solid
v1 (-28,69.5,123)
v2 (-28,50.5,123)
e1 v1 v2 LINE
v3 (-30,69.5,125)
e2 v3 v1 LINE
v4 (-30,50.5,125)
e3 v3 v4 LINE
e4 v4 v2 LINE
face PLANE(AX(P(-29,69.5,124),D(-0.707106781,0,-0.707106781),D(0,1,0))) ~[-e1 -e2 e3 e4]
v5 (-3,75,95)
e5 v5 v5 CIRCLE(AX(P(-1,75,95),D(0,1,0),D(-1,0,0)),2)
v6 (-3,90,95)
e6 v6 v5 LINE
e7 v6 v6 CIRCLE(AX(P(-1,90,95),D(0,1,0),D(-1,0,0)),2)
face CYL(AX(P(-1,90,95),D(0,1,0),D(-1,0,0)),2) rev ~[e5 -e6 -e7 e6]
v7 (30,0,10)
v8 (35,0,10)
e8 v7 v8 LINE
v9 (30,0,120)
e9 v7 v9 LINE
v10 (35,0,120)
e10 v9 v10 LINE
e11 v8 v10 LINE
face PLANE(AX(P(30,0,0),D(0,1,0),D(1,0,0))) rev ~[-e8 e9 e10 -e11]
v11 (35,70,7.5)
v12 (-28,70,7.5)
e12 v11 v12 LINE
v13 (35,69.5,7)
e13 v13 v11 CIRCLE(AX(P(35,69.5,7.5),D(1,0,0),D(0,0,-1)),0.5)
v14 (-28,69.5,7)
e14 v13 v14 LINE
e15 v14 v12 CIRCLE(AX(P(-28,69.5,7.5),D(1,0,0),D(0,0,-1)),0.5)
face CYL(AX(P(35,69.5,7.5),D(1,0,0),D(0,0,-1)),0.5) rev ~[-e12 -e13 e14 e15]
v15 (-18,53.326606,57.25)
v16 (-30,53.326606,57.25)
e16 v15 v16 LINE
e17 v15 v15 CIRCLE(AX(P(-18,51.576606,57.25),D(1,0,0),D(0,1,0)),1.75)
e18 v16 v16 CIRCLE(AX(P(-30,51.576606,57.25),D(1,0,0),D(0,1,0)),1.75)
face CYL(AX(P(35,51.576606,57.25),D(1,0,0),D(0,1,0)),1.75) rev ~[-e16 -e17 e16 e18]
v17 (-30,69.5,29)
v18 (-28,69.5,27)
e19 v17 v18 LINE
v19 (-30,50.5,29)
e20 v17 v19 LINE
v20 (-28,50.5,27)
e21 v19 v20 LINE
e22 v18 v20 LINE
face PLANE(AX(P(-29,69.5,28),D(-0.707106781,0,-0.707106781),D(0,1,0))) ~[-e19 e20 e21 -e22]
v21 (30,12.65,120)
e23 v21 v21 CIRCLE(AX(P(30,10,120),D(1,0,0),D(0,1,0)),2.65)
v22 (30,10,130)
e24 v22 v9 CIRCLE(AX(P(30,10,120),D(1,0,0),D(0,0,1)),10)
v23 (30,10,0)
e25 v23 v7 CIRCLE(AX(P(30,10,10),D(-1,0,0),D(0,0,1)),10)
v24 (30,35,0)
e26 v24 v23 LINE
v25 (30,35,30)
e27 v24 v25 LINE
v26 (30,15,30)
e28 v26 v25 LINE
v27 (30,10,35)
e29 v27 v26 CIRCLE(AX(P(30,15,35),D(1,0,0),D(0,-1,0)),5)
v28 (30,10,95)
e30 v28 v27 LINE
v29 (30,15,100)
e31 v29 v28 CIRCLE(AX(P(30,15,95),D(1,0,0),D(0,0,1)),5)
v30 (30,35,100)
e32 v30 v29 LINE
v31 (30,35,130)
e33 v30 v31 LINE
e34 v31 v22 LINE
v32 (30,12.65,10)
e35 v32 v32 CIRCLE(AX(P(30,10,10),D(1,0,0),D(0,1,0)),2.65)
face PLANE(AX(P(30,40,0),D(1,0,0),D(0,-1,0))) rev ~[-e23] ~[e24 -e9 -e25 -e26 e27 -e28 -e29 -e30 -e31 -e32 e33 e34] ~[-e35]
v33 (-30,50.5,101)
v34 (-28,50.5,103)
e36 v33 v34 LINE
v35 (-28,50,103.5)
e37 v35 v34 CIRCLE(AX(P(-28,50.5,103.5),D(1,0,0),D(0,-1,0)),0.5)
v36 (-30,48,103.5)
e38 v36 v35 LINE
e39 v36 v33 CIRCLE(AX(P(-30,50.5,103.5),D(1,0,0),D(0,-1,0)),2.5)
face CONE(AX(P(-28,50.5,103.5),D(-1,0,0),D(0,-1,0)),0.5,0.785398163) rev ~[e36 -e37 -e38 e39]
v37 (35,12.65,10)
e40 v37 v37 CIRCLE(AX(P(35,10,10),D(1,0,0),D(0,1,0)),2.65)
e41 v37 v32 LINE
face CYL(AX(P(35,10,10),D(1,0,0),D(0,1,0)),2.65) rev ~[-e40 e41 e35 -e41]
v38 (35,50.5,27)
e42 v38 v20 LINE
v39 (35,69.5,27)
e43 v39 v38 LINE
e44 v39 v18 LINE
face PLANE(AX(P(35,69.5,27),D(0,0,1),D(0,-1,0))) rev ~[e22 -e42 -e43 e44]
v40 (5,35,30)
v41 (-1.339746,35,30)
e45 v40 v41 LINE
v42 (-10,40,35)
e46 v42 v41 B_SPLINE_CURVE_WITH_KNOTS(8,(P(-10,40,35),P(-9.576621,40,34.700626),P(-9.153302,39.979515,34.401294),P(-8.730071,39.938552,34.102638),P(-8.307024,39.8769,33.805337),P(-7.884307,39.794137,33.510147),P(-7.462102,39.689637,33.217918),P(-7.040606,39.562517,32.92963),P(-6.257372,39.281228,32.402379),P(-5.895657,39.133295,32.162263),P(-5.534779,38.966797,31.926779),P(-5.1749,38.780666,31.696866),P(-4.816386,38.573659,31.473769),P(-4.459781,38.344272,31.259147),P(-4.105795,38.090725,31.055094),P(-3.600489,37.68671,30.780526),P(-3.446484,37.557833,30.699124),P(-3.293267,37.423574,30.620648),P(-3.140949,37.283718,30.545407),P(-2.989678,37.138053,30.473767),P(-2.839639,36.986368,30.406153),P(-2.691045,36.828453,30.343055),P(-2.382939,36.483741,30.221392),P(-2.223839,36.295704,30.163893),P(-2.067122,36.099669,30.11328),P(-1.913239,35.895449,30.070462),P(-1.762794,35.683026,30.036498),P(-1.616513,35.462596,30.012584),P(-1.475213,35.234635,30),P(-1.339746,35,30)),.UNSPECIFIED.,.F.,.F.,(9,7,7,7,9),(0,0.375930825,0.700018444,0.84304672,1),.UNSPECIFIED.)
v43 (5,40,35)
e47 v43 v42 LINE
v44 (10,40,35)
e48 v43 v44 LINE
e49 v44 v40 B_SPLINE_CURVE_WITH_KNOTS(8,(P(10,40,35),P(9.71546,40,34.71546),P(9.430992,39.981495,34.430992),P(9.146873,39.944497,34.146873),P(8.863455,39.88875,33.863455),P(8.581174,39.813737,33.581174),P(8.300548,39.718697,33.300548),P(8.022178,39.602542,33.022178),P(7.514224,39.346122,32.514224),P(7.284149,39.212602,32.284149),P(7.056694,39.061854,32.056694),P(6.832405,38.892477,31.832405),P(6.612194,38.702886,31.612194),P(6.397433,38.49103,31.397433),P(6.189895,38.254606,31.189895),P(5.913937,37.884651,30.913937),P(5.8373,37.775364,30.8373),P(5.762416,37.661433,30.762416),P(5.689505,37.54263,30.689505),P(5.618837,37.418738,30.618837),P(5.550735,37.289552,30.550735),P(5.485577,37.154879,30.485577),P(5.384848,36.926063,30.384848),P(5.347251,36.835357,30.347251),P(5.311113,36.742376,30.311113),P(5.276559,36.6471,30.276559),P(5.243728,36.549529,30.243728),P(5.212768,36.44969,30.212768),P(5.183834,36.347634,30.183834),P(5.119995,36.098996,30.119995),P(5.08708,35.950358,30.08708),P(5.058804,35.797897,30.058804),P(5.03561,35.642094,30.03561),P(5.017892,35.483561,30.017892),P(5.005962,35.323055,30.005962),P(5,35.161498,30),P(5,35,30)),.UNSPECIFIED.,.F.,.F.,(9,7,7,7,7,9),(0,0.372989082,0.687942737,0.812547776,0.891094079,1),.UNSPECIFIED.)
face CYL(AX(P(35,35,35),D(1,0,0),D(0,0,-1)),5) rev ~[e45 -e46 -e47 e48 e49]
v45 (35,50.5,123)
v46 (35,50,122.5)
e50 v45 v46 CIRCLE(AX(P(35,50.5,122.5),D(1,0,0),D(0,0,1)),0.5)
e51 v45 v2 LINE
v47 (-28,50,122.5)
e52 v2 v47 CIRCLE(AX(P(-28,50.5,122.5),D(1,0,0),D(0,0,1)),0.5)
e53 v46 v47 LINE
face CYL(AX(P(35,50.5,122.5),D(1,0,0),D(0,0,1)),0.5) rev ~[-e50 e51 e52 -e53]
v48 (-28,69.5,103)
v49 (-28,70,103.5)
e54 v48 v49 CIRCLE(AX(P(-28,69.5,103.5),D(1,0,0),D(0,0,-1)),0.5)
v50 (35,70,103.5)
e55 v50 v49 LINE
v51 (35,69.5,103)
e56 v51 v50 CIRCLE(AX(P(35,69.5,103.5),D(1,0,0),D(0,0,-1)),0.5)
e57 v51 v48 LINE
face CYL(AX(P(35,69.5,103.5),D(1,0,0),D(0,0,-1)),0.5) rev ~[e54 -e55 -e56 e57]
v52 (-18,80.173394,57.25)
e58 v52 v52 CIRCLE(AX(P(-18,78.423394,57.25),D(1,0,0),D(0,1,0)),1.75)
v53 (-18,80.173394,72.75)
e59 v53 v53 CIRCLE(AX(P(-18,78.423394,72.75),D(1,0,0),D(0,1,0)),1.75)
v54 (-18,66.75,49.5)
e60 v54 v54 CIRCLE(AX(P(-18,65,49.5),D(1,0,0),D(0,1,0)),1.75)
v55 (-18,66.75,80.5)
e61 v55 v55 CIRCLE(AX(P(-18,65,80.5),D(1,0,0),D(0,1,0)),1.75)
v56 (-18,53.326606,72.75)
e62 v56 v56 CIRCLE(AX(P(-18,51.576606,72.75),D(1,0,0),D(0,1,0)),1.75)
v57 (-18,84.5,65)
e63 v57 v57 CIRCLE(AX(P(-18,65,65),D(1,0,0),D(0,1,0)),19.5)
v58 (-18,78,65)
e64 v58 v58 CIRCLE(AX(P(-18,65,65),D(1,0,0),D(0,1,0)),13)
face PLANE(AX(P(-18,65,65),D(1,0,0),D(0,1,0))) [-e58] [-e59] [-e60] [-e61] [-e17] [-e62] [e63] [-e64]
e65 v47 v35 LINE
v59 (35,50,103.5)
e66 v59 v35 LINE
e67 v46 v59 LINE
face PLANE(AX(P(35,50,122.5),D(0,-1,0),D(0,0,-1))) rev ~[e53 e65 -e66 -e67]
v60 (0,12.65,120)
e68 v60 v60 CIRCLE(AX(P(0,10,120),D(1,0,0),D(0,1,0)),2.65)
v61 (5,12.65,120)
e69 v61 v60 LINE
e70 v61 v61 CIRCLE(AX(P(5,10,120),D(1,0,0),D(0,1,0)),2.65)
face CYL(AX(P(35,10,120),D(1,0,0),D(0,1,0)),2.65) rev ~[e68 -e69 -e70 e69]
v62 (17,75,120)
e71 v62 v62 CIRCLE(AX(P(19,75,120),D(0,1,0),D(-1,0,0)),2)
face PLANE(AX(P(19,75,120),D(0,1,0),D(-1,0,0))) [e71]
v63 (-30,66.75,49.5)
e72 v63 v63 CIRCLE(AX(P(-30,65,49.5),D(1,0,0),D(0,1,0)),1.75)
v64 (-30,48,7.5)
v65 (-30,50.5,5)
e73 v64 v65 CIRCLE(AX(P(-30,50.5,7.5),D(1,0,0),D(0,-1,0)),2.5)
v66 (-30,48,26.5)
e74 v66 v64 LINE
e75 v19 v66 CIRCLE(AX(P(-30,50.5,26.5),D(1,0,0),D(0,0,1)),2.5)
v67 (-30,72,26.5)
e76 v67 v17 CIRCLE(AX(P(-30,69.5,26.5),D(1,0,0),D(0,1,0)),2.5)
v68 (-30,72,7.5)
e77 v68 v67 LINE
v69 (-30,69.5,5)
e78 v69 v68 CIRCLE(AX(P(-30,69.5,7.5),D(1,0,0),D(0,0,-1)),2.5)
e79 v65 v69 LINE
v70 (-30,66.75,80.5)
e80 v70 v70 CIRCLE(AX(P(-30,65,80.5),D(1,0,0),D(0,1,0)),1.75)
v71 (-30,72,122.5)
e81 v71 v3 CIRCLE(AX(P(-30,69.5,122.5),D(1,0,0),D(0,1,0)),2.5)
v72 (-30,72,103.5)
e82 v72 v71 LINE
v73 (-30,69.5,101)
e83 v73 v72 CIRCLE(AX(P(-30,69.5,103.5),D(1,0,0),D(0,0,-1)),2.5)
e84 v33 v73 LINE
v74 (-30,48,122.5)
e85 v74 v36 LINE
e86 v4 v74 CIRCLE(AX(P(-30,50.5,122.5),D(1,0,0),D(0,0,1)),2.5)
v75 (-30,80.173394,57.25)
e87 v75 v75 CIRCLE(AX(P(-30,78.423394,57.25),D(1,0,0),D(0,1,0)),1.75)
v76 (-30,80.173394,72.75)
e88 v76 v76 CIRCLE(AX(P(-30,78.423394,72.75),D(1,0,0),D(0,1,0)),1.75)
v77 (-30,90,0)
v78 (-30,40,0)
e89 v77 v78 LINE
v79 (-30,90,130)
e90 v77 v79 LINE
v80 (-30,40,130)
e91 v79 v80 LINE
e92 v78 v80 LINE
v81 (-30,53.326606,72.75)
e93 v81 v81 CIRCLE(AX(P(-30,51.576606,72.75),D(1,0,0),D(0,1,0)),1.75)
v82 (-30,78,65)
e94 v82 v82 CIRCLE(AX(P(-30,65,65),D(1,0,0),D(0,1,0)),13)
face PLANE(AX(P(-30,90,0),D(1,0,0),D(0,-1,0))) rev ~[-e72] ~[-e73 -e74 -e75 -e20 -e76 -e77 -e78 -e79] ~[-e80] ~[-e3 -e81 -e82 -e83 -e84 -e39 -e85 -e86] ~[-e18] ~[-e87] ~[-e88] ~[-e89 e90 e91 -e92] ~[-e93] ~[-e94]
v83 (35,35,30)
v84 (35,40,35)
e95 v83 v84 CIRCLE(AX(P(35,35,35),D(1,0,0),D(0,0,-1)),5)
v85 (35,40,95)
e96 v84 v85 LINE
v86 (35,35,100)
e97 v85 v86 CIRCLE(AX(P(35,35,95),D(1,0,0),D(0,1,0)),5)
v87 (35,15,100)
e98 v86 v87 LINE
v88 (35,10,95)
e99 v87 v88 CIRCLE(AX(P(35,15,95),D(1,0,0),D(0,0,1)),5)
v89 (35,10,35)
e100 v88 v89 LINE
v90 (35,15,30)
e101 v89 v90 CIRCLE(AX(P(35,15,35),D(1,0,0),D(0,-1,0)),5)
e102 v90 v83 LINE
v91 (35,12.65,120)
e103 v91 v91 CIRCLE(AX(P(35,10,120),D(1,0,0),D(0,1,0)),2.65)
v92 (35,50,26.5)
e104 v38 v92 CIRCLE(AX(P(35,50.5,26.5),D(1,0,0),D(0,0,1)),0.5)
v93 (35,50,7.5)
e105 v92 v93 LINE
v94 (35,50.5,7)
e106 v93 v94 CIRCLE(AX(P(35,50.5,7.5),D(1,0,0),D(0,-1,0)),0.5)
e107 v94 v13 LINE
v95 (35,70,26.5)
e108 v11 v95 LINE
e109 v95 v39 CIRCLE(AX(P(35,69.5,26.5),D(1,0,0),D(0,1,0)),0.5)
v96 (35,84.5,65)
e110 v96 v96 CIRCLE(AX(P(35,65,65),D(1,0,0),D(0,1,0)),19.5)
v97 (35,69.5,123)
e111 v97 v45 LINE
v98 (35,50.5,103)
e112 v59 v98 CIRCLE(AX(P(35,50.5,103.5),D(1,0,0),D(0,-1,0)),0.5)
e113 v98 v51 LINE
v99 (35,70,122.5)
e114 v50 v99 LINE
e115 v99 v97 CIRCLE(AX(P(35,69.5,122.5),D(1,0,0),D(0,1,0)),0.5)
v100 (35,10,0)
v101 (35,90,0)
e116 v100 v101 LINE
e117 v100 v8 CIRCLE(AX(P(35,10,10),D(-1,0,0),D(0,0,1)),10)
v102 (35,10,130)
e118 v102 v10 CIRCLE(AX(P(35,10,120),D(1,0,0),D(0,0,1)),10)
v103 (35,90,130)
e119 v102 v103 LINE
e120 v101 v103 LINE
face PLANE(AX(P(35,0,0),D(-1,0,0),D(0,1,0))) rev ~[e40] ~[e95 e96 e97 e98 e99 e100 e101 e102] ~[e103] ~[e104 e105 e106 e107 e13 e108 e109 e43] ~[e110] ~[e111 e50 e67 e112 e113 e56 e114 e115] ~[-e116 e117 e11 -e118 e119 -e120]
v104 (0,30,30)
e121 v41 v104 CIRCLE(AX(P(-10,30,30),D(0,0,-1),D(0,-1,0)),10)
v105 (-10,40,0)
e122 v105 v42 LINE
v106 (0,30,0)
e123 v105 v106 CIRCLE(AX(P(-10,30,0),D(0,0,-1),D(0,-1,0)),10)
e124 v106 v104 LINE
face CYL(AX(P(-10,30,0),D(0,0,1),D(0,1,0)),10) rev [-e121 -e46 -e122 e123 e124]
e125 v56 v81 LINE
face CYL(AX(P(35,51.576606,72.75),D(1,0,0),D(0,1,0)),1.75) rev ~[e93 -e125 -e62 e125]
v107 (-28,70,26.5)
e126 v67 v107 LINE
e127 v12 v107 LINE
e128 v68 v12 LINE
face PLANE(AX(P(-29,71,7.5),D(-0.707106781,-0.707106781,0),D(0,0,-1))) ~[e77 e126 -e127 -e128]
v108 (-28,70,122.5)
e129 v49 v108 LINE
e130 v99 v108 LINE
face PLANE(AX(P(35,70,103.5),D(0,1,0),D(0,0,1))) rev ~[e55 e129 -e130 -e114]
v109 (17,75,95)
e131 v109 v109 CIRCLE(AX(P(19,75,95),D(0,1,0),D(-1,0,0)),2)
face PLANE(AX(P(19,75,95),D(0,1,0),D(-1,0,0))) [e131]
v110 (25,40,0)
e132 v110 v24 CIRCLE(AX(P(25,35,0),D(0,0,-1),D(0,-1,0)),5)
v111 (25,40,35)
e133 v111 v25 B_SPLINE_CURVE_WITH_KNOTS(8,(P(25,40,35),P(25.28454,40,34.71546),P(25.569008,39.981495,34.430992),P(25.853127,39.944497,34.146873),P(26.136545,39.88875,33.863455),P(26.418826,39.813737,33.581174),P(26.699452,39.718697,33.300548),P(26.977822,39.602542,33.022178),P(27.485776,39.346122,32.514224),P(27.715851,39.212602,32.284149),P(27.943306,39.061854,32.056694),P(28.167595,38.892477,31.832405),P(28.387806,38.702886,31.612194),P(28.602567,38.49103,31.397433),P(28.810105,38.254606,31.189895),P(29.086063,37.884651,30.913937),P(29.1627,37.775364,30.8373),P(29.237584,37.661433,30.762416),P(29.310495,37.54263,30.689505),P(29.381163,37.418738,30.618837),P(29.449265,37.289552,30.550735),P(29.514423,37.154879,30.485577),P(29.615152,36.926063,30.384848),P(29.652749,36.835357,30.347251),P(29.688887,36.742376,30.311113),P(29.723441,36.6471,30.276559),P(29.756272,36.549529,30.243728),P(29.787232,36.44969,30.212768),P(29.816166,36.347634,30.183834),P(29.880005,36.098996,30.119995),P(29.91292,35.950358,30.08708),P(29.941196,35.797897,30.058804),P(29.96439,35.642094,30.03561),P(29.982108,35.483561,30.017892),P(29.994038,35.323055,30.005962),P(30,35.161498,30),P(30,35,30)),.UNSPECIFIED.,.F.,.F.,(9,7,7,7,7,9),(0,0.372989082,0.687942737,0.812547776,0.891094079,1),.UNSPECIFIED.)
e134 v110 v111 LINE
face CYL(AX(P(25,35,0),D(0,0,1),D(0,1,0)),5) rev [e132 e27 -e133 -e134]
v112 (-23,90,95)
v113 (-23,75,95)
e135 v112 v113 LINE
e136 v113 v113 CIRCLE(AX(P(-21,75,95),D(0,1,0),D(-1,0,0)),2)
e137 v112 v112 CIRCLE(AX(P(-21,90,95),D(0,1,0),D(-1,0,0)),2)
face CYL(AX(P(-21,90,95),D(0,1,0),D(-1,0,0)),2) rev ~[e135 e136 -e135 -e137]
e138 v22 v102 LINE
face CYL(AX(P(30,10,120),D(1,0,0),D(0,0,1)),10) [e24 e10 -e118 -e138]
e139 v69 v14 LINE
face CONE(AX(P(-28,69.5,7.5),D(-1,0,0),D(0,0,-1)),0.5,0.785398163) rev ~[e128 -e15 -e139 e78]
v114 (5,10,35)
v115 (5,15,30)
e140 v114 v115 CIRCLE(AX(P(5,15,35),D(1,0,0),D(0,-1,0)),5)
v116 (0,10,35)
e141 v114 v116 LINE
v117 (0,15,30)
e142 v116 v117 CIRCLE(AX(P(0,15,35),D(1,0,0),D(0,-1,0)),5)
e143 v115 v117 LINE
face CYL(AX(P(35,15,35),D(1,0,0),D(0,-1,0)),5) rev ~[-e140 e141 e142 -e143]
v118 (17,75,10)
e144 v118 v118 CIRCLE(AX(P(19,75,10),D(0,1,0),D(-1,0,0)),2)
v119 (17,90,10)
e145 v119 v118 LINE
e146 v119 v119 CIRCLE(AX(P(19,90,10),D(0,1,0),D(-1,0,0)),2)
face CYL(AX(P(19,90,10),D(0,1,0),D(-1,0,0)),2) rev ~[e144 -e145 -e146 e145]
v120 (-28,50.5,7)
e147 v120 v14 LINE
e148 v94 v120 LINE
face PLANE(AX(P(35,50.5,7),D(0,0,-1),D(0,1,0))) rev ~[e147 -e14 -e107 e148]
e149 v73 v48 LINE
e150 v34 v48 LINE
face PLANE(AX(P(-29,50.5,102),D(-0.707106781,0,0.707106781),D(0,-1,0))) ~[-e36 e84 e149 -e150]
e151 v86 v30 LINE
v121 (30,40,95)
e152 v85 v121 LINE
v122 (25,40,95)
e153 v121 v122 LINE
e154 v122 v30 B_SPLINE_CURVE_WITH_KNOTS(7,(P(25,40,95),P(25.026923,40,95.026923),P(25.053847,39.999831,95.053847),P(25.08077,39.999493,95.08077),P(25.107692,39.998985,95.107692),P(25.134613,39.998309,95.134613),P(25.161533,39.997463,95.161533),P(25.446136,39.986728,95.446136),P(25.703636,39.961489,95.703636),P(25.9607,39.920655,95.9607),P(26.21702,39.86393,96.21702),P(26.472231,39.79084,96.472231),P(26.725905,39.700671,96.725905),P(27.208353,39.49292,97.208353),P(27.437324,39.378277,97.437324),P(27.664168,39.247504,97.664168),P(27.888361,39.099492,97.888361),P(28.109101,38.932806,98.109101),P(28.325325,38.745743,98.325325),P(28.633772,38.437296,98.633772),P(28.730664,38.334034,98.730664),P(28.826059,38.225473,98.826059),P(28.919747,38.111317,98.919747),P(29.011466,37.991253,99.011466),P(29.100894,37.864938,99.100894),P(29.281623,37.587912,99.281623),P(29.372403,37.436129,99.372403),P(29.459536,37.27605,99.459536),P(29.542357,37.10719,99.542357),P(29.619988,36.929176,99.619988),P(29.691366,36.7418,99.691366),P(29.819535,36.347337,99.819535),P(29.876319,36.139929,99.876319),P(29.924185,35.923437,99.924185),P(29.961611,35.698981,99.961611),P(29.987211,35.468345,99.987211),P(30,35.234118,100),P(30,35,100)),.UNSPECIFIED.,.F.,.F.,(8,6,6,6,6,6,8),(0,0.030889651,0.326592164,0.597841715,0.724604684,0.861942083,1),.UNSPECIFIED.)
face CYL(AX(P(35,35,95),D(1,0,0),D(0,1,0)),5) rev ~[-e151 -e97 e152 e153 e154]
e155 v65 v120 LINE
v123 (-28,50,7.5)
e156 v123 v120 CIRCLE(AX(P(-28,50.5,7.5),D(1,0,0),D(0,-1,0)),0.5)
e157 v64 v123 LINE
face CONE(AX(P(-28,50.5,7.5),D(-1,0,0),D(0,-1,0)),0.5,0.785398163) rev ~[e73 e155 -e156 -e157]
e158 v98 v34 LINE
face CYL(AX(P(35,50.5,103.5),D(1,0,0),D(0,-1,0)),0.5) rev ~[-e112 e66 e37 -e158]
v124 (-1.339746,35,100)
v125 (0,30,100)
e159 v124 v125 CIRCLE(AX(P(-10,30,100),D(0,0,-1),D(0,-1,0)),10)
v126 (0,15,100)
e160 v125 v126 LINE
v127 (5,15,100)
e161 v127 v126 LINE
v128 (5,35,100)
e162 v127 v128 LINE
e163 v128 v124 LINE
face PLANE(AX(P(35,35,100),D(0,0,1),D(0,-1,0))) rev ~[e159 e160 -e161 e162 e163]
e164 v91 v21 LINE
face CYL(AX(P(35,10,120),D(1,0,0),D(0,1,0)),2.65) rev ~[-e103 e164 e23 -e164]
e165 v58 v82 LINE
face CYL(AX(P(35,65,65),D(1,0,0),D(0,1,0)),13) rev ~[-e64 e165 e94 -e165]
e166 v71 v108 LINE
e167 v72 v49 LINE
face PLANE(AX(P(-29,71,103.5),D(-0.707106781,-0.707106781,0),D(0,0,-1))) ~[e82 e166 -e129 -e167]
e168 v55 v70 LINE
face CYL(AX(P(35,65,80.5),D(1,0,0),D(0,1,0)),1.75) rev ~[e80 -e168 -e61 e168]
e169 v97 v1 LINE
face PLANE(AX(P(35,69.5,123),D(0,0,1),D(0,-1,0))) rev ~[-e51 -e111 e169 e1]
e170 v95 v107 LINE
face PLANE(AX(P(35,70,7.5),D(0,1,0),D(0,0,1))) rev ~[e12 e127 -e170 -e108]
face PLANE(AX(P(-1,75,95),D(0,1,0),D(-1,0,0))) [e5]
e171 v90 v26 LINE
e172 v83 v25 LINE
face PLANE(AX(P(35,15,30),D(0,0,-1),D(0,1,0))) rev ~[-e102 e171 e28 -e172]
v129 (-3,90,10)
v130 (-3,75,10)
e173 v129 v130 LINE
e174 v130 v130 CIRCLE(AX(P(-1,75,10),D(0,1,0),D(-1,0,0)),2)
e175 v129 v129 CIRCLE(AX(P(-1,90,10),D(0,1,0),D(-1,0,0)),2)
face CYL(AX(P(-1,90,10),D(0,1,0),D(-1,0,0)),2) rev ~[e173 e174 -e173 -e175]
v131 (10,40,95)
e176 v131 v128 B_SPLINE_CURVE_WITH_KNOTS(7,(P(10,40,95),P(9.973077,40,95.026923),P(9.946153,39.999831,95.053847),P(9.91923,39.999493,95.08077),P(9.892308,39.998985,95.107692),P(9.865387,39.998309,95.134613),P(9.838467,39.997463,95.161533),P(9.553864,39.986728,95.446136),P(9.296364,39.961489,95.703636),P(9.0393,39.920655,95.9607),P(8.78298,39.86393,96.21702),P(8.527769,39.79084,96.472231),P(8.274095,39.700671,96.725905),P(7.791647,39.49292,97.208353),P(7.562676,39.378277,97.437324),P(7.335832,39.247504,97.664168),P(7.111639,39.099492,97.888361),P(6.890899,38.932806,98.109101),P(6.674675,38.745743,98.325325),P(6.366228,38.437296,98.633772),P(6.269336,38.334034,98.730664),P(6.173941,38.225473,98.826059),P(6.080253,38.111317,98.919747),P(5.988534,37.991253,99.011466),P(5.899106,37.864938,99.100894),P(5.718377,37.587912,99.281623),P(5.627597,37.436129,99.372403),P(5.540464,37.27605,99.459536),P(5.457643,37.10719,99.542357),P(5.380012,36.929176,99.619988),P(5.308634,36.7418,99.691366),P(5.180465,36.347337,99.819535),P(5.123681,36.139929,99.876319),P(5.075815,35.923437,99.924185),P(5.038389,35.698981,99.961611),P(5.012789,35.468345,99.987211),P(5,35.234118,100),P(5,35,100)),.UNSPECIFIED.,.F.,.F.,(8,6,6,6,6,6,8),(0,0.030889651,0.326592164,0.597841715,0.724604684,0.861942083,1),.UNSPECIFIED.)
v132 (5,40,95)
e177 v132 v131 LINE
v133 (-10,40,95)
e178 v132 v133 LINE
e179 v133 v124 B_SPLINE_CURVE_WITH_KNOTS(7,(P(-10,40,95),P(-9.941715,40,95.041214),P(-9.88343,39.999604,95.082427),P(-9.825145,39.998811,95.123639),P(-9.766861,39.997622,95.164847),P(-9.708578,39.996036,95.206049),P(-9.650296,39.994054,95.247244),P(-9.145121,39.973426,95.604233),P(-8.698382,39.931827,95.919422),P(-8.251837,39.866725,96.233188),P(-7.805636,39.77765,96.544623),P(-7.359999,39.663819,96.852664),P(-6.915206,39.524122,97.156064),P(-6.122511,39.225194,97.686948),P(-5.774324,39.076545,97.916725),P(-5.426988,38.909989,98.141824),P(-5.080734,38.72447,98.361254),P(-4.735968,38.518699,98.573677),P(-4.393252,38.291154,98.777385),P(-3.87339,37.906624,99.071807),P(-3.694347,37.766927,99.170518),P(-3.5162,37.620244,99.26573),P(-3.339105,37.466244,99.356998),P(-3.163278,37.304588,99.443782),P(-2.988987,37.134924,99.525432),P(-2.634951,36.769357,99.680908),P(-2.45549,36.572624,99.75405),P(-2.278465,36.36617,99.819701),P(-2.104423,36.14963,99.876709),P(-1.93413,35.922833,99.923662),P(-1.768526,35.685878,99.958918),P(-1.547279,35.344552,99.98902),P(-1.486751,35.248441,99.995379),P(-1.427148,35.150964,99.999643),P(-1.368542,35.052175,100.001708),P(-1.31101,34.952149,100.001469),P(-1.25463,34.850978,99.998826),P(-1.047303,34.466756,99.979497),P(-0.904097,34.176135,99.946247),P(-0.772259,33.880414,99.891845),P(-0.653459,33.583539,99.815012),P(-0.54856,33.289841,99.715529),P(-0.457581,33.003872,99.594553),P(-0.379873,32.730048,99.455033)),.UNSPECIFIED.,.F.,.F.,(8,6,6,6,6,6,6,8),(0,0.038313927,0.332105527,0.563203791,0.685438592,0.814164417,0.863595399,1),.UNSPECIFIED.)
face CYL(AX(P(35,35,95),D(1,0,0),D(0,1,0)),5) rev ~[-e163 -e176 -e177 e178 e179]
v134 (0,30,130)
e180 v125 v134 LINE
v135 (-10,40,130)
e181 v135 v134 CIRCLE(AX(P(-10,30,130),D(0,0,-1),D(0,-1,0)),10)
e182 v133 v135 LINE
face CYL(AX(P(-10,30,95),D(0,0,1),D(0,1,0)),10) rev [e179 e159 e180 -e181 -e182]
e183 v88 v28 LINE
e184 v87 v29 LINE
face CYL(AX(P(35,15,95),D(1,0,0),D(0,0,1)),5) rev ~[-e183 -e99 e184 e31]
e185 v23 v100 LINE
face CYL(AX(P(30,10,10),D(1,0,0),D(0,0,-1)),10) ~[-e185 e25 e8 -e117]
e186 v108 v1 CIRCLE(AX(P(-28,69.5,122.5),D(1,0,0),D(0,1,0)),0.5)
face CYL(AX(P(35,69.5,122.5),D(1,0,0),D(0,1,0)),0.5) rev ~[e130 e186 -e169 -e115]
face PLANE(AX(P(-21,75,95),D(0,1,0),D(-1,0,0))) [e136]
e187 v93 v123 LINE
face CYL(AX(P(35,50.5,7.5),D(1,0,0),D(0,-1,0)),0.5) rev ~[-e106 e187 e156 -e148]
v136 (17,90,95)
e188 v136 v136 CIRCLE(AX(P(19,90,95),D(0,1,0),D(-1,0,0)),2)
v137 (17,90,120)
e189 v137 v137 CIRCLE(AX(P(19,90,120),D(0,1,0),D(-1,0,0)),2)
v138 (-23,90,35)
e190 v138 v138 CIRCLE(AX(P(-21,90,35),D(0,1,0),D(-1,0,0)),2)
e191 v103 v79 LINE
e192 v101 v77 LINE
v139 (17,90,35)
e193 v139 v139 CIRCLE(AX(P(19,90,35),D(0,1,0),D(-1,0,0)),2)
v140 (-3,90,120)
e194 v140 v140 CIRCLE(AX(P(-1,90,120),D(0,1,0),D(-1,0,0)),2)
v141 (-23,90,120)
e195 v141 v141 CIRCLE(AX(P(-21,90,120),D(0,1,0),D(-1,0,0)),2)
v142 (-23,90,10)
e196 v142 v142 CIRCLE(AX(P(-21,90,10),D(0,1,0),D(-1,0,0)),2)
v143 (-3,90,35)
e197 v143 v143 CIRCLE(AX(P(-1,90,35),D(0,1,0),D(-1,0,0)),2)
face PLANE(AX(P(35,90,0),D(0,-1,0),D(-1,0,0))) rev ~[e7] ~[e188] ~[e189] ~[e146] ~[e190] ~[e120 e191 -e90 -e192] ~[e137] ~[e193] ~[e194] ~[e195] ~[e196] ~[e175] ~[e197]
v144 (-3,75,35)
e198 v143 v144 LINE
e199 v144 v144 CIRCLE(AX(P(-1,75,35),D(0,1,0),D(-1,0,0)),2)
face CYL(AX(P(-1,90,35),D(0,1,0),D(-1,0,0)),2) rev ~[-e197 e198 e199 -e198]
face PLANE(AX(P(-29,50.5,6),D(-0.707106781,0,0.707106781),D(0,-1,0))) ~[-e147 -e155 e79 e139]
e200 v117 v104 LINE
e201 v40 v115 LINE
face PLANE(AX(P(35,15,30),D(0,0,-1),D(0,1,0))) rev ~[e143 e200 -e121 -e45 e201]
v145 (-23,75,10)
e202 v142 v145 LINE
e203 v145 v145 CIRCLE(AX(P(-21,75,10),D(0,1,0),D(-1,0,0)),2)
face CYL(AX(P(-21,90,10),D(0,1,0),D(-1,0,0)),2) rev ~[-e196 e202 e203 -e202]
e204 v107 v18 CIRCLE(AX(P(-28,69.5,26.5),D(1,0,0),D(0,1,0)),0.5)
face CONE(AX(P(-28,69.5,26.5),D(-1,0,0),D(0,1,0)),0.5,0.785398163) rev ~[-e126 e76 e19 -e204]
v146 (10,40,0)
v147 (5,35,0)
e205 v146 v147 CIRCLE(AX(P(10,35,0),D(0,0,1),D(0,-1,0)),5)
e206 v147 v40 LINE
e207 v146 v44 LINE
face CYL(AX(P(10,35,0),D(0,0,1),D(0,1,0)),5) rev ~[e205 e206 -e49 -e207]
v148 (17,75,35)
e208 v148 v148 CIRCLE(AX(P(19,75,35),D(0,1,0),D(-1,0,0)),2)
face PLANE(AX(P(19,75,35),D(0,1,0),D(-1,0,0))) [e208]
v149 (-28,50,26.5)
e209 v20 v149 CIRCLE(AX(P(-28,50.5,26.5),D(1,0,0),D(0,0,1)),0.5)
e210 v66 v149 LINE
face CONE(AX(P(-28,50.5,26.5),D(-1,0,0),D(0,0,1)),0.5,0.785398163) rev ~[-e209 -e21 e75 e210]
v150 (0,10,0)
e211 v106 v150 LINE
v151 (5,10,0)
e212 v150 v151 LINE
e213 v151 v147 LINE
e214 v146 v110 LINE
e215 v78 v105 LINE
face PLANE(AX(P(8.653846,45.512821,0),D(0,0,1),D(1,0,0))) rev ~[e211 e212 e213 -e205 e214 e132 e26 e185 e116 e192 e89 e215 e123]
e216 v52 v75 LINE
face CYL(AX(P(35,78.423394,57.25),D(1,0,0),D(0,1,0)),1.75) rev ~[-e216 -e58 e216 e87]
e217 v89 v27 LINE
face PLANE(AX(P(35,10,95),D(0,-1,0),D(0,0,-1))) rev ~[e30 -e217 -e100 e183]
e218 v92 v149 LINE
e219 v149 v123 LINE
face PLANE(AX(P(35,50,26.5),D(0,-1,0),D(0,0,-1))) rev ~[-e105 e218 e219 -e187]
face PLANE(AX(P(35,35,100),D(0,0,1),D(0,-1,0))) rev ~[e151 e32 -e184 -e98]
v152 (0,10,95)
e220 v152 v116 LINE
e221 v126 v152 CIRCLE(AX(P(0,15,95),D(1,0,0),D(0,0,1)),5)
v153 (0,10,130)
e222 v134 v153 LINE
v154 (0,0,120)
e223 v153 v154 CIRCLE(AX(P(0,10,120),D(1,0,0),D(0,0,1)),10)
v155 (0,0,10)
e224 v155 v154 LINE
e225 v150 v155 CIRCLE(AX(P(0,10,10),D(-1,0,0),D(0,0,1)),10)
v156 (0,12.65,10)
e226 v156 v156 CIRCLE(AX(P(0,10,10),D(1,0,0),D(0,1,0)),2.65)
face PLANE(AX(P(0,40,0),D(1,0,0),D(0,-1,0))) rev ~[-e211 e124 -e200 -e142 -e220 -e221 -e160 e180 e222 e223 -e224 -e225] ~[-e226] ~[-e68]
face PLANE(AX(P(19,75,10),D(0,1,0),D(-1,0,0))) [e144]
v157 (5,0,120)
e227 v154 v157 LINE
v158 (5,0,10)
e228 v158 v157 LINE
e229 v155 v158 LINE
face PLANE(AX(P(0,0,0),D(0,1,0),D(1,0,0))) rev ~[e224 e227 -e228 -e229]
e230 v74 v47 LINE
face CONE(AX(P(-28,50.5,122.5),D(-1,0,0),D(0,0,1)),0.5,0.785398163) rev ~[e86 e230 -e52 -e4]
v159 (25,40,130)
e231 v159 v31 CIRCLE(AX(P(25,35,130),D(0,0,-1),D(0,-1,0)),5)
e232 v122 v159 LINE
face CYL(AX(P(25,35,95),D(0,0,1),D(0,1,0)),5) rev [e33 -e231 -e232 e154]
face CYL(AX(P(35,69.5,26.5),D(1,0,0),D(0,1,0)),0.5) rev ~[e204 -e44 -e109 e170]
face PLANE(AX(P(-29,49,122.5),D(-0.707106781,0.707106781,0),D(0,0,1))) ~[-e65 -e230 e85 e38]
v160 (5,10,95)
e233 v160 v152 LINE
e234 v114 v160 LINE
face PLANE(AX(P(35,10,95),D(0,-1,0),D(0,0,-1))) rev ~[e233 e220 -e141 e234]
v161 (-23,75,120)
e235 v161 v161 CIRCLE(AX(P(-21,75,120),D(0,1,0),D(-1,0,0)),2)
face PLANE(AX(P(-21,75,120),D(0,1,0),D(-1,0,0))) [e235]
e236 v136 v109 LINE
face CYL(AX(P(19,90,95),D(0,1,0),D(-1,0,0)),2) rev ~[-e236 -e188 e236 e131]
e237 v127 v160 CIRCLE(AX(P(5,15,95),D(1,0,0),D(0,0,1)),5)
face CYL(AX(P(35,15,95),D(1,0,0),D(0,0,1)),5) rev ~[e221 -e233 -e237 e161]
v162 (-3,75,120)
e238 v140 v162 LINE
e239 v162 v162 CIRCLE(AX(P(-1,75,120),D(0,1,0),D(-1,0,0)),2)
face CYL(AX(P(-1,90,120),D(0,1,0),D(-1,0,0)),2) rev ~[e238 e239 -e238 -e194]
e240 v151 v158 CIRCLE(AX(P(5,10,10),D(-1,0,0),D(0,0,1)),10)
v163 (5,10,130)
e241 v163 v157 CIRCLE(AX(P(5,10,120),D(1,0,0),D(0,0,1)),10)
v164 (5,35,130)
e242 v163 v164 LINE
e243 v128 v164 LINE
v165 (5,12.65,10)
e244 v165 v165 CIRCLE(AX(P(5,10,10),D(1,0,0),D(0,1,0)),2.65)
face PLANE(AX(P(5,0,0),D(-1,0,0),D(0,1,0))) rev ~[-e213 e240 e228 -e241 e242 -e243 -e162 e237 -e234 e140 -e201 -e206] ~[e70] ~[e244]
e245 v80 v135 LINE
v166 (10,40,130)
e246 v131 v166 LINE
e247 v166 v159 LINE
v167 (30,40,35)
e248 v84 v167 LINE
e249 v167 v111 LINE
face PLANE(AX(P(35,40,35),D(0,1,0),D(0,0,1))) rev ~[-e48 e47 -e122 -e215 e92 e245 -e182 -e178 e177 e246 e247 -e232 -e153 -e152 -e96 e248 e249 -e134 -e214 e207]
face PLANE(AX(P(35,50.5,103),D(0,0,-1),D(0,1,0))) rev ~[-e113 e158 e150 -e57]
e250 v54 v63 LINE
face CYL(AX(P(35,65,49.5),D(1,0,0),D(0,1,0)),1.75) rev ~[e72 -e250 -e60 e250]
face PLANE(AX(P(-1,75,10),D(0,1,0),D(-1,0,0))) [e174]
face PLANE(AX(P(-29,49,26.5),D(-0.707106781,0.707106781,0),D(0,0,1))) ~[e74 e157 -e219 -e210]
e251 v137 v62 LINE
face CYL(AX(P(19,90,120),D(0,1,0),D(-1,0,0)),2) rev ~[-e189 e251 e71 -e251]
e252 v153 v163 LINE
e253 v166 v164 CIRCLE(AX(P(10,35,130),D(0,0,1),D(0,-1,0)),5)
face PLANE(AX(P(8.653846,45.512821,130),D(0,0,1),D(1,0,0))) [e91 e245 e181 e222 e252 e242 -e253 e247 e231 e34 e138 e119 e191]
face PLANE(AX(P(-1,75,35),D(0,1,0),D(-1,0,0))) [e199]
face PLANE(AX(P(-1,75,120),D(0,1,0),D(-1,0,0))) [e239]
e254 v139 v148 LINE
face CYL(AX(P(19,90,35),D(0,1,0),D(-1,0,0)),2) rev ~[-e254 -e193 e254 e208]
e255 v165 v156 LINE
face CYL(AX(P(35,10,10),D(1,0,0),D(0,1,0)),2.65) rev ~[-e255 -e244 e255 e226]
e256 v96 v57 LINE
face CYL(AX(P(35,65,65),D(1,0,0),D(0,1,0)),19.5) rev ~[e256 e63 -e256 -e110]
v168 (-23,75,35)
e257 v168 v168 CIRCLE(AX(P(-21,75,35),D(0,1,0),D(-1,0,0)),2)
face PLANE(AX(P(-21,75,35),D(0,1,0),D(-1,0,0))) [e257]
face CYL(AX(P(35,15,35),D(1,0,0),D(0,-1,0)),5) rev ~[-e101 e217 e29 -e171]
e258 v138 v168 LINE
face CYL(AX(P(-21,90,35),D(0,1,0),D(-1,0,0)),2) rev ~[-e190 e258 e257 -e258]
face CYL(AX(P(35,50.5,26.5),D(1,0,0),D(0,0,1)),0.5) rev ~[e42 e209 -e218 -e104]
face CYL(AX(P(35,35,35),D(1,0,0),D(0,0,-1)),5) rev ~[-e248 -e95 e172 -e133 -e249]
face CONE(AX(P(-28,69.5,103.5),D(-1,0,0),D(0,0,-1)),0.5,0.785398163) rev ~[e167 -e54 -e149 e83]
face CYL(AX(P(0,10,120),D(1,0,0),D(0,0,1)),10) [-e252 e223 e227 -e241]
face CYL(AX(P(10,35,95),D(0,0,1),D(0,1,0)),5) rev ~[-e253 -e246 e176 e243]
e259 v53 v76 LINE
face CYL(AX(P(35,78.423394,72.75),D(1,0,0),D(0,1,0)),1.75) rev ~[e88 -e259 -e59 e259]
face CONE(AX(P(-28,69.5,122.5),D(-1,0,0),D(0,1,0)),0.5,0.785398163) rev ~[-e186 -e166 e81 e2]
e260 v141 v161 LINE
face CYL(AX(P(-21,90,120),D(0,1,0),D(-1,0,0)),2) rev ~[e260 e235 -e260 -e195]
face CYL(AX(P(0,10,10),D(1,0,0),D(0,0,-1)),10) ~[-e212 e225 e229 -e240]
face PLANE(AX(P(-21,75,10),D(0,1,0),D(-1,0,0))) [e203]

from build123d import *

# Parameters (mm, degrees)
F1_DEPTH = 130
F2_R     = 2.65
F2_R_2   = 13
F2_R_3   = 1.75
F3_DEPTH = 80
F2_R_4   = 19.5
F4_DEPTH = 53
F5_R     = 10
F6_R     = 5
F7_SIZE  = 2
F8_R     = 2
F9_DEPTH = 15


# Not quite as in the source:
# - a feature names something its author has since deleted; it is built from what else it names


with BuildPart() as f1:
    # F0 (on Top) → F1 (new body)
    with BuildSketch(Plane.XY):
        Polygon((35, 90), (-30, 90), (-30, 40), (0, 40), (0, 0), (5, 0), (5, 40), (30, 40), (30, 0), (35, 0), align=None)
    extrude(amount=F1_DEPTH)

    # F2 (on face) → F3 (cut)
    with BuildSketch(Plane.YZ.offset(35)):
        with Locations((10, 120)):
            Circle(F2_R)
        with Locations((10, 10)):
            Circle(F2_R)
        with BuildLine():
            ThreePointArc((10, 35), (11.4644660941, 31.4644660941), (15, 30))
            Line((15, 30), (35, 30))
            ThreePointArc((35, 30), (38.5355339059, 31.4644660941), (40, 35))
            Line((40, 35), (40, 95))
            ThreePointArc((40, 95), (38.5355339059, 98.5355339059), (35, 100))
            Line((35, 100), (15, 100))
            ThreePointArc((15, 100), (11.4644660941, 98.5355339059), (10, 95))
            Line((10, 95), (10, 35))
        make_face()
        with Locations((65, 65)):
            Circle(F2_R_2)
        with Locations((65, 49.5)):
            Circle(F2_R_3)
        with Locations((51.5766062413, 57.25)):
            Circle(F2_R_3)
        with Locations((51.5766062413, 72.75)):
            Circle(F2_R_3)
        with Locations((65, 80.5)):
            Circle(F2_R_3)
        with Locations((78.4233937587, 72.75)):
            Circle(F2_R_3)
        with Locations((78.4233937587, 57.25)):
            Circle(F2_R_3)
        with BuildLine():
            Line((50, 26.5), (50, 7.5))
            ThreePointArc((50, 7.5), (50.1464466094, 7.1464466094), (50.5, 7))
            Line((50.5, 7), (69.5, 7))
            ThreePointArc((69.5, 7), (69.8535533906, 7.1464466094), (70, 7.5))
            Line((70, 7.5), (70, 26.5))
            ThreePointArc((70, 26.5), (69.8535533906, 26.8535533906), (69.5, 27))
            Line((69.5, 27), (50.5, 27))
            ThreePointArc((50.5, 27), (50.1464466094, 26.8535533906), (50, 26.5))
        make_face()
        with BuildLine():
            ThreePointArc((50, 103.5), (50.1464466094, 103.1464466094), (50.5, 103))
            Line((50.5, 103), (69.5, 103))
            ThreePointArc((69.5, 103), (69.8535533906, 103.1464466094), (70, 103.5))
            Line((70, 103.5), (70, 122.5))
            ThreePointArc((70, 122.5), (69.8535533906, 122.8535533906), (69.5, 123))
            Line((69.5, 123), (50.5, 123))
            ThreePointArc((50.5, 123), (50.1464466094, 122.8535533906), (50, 122.5))
            Line((50, 122.5), (50, 103.5))
        make_face()
    extrude(amount=-F3_DEPTH, mode=Mode.SUBTRACT)

    # F2 (on face) → F4 (cut)
    with BuildSketch(Plane.YZ.offset(35)):
        with Locations((65, 65)):
            Circle(F2_R_4)
        with Locations((51.5766062413, 57.25)):
            Circle(F2_R_3, mode=Mode.SUBTRACT)
        with Locations((65, 49.5)):
            Circle(F2_R_3, mode=Mode.SUBTRACT)
        with Locations((78.4233937587, 57.25)):
            Circle(F2_R_3, mode=Mode.SUBTRACT)
        with Locations((51.5766062413, 72.75)):
            Circle(F2_R_3, mode=Mode.SUBTRACT)
        with Locations((65, 65)):
            Circle(F2_R_2, mode=Mode.SUBTRACT)
        with Locations((65, 80.5)):
            Circle(F2_R_3, mode=Mode.SUBTRACT)
        with Locations((78.4233937587, 72.75)):
            Circle(F2_R_3, mode=Mode.SUBTRACT)
    extrude(amount=-F4_DEPTH, mode=Mode.SUBTRACT)

    # F5
    f5_edges = [f1.edges().sort_by_distance(p)[0] for p in [
        (32.5, 0, 130),
        (2.5, 0, 130),
        (32.5, 0, 0),
        (2.5, 0, 0),
        (0, 40, 112.5),
        (0, 40, 17.5),
    ]]
    fillet(f5_edges, radius=F5_R)

    # F6
    f6_edges = [f1.edges().sort_by_distance(p)[0] for p in [
        (5, 40, 112.5),
        (5, 40, 17.5),
        (30, 40, 112.5),
        (30, 40, 17.5),
    ]]
    fillet(f6_edges, radius=F6_R)

    # F7
    f7_edges = [f1.edges().sort_by_distance(p)[0] for p in [
        (-30, 60, 123),
        (-30, 60, 27),
    ]]
    chamfer(f7_edges, length=F7_SIZE)

    # F8 (on face) → F9 (cut)
    with BuildSketch(Plane(origin=(0, 90, 0), x_dir=(-1, 0, 0), z_dir=(0, 1, 0))):
        with Locations((21, 10)):
            Circle(F8_R)
        with Locations((1, 10)):
            Circle(F8_R)
        with Locations((-19, 10)):
            Circle(F8_R)
        with Locations((1, 35)):
            Circle(F8_R)
        with Locations((-19, 35)):
            Circle(F8_R)
        with Locations((21, 35)):
            Circle(F8_R)
        with Locations((21, 95)):
            Circle(F8_R)
        with Locations((1, 95)):
            Circle(F8_R)
        with Locations((-19, 95)):
            Circle(F8_R)
        with Locations((-19, 120)):
            Circle(F8_R)
        with Locations((1, 120)):
            Circle(F8_R)
        with Locations((21, 120)):
            Circle(F8_R)
    extrude(amount=-F9_DEPTH, mode=Mode.SUBTRACT)


solid = f1.part
